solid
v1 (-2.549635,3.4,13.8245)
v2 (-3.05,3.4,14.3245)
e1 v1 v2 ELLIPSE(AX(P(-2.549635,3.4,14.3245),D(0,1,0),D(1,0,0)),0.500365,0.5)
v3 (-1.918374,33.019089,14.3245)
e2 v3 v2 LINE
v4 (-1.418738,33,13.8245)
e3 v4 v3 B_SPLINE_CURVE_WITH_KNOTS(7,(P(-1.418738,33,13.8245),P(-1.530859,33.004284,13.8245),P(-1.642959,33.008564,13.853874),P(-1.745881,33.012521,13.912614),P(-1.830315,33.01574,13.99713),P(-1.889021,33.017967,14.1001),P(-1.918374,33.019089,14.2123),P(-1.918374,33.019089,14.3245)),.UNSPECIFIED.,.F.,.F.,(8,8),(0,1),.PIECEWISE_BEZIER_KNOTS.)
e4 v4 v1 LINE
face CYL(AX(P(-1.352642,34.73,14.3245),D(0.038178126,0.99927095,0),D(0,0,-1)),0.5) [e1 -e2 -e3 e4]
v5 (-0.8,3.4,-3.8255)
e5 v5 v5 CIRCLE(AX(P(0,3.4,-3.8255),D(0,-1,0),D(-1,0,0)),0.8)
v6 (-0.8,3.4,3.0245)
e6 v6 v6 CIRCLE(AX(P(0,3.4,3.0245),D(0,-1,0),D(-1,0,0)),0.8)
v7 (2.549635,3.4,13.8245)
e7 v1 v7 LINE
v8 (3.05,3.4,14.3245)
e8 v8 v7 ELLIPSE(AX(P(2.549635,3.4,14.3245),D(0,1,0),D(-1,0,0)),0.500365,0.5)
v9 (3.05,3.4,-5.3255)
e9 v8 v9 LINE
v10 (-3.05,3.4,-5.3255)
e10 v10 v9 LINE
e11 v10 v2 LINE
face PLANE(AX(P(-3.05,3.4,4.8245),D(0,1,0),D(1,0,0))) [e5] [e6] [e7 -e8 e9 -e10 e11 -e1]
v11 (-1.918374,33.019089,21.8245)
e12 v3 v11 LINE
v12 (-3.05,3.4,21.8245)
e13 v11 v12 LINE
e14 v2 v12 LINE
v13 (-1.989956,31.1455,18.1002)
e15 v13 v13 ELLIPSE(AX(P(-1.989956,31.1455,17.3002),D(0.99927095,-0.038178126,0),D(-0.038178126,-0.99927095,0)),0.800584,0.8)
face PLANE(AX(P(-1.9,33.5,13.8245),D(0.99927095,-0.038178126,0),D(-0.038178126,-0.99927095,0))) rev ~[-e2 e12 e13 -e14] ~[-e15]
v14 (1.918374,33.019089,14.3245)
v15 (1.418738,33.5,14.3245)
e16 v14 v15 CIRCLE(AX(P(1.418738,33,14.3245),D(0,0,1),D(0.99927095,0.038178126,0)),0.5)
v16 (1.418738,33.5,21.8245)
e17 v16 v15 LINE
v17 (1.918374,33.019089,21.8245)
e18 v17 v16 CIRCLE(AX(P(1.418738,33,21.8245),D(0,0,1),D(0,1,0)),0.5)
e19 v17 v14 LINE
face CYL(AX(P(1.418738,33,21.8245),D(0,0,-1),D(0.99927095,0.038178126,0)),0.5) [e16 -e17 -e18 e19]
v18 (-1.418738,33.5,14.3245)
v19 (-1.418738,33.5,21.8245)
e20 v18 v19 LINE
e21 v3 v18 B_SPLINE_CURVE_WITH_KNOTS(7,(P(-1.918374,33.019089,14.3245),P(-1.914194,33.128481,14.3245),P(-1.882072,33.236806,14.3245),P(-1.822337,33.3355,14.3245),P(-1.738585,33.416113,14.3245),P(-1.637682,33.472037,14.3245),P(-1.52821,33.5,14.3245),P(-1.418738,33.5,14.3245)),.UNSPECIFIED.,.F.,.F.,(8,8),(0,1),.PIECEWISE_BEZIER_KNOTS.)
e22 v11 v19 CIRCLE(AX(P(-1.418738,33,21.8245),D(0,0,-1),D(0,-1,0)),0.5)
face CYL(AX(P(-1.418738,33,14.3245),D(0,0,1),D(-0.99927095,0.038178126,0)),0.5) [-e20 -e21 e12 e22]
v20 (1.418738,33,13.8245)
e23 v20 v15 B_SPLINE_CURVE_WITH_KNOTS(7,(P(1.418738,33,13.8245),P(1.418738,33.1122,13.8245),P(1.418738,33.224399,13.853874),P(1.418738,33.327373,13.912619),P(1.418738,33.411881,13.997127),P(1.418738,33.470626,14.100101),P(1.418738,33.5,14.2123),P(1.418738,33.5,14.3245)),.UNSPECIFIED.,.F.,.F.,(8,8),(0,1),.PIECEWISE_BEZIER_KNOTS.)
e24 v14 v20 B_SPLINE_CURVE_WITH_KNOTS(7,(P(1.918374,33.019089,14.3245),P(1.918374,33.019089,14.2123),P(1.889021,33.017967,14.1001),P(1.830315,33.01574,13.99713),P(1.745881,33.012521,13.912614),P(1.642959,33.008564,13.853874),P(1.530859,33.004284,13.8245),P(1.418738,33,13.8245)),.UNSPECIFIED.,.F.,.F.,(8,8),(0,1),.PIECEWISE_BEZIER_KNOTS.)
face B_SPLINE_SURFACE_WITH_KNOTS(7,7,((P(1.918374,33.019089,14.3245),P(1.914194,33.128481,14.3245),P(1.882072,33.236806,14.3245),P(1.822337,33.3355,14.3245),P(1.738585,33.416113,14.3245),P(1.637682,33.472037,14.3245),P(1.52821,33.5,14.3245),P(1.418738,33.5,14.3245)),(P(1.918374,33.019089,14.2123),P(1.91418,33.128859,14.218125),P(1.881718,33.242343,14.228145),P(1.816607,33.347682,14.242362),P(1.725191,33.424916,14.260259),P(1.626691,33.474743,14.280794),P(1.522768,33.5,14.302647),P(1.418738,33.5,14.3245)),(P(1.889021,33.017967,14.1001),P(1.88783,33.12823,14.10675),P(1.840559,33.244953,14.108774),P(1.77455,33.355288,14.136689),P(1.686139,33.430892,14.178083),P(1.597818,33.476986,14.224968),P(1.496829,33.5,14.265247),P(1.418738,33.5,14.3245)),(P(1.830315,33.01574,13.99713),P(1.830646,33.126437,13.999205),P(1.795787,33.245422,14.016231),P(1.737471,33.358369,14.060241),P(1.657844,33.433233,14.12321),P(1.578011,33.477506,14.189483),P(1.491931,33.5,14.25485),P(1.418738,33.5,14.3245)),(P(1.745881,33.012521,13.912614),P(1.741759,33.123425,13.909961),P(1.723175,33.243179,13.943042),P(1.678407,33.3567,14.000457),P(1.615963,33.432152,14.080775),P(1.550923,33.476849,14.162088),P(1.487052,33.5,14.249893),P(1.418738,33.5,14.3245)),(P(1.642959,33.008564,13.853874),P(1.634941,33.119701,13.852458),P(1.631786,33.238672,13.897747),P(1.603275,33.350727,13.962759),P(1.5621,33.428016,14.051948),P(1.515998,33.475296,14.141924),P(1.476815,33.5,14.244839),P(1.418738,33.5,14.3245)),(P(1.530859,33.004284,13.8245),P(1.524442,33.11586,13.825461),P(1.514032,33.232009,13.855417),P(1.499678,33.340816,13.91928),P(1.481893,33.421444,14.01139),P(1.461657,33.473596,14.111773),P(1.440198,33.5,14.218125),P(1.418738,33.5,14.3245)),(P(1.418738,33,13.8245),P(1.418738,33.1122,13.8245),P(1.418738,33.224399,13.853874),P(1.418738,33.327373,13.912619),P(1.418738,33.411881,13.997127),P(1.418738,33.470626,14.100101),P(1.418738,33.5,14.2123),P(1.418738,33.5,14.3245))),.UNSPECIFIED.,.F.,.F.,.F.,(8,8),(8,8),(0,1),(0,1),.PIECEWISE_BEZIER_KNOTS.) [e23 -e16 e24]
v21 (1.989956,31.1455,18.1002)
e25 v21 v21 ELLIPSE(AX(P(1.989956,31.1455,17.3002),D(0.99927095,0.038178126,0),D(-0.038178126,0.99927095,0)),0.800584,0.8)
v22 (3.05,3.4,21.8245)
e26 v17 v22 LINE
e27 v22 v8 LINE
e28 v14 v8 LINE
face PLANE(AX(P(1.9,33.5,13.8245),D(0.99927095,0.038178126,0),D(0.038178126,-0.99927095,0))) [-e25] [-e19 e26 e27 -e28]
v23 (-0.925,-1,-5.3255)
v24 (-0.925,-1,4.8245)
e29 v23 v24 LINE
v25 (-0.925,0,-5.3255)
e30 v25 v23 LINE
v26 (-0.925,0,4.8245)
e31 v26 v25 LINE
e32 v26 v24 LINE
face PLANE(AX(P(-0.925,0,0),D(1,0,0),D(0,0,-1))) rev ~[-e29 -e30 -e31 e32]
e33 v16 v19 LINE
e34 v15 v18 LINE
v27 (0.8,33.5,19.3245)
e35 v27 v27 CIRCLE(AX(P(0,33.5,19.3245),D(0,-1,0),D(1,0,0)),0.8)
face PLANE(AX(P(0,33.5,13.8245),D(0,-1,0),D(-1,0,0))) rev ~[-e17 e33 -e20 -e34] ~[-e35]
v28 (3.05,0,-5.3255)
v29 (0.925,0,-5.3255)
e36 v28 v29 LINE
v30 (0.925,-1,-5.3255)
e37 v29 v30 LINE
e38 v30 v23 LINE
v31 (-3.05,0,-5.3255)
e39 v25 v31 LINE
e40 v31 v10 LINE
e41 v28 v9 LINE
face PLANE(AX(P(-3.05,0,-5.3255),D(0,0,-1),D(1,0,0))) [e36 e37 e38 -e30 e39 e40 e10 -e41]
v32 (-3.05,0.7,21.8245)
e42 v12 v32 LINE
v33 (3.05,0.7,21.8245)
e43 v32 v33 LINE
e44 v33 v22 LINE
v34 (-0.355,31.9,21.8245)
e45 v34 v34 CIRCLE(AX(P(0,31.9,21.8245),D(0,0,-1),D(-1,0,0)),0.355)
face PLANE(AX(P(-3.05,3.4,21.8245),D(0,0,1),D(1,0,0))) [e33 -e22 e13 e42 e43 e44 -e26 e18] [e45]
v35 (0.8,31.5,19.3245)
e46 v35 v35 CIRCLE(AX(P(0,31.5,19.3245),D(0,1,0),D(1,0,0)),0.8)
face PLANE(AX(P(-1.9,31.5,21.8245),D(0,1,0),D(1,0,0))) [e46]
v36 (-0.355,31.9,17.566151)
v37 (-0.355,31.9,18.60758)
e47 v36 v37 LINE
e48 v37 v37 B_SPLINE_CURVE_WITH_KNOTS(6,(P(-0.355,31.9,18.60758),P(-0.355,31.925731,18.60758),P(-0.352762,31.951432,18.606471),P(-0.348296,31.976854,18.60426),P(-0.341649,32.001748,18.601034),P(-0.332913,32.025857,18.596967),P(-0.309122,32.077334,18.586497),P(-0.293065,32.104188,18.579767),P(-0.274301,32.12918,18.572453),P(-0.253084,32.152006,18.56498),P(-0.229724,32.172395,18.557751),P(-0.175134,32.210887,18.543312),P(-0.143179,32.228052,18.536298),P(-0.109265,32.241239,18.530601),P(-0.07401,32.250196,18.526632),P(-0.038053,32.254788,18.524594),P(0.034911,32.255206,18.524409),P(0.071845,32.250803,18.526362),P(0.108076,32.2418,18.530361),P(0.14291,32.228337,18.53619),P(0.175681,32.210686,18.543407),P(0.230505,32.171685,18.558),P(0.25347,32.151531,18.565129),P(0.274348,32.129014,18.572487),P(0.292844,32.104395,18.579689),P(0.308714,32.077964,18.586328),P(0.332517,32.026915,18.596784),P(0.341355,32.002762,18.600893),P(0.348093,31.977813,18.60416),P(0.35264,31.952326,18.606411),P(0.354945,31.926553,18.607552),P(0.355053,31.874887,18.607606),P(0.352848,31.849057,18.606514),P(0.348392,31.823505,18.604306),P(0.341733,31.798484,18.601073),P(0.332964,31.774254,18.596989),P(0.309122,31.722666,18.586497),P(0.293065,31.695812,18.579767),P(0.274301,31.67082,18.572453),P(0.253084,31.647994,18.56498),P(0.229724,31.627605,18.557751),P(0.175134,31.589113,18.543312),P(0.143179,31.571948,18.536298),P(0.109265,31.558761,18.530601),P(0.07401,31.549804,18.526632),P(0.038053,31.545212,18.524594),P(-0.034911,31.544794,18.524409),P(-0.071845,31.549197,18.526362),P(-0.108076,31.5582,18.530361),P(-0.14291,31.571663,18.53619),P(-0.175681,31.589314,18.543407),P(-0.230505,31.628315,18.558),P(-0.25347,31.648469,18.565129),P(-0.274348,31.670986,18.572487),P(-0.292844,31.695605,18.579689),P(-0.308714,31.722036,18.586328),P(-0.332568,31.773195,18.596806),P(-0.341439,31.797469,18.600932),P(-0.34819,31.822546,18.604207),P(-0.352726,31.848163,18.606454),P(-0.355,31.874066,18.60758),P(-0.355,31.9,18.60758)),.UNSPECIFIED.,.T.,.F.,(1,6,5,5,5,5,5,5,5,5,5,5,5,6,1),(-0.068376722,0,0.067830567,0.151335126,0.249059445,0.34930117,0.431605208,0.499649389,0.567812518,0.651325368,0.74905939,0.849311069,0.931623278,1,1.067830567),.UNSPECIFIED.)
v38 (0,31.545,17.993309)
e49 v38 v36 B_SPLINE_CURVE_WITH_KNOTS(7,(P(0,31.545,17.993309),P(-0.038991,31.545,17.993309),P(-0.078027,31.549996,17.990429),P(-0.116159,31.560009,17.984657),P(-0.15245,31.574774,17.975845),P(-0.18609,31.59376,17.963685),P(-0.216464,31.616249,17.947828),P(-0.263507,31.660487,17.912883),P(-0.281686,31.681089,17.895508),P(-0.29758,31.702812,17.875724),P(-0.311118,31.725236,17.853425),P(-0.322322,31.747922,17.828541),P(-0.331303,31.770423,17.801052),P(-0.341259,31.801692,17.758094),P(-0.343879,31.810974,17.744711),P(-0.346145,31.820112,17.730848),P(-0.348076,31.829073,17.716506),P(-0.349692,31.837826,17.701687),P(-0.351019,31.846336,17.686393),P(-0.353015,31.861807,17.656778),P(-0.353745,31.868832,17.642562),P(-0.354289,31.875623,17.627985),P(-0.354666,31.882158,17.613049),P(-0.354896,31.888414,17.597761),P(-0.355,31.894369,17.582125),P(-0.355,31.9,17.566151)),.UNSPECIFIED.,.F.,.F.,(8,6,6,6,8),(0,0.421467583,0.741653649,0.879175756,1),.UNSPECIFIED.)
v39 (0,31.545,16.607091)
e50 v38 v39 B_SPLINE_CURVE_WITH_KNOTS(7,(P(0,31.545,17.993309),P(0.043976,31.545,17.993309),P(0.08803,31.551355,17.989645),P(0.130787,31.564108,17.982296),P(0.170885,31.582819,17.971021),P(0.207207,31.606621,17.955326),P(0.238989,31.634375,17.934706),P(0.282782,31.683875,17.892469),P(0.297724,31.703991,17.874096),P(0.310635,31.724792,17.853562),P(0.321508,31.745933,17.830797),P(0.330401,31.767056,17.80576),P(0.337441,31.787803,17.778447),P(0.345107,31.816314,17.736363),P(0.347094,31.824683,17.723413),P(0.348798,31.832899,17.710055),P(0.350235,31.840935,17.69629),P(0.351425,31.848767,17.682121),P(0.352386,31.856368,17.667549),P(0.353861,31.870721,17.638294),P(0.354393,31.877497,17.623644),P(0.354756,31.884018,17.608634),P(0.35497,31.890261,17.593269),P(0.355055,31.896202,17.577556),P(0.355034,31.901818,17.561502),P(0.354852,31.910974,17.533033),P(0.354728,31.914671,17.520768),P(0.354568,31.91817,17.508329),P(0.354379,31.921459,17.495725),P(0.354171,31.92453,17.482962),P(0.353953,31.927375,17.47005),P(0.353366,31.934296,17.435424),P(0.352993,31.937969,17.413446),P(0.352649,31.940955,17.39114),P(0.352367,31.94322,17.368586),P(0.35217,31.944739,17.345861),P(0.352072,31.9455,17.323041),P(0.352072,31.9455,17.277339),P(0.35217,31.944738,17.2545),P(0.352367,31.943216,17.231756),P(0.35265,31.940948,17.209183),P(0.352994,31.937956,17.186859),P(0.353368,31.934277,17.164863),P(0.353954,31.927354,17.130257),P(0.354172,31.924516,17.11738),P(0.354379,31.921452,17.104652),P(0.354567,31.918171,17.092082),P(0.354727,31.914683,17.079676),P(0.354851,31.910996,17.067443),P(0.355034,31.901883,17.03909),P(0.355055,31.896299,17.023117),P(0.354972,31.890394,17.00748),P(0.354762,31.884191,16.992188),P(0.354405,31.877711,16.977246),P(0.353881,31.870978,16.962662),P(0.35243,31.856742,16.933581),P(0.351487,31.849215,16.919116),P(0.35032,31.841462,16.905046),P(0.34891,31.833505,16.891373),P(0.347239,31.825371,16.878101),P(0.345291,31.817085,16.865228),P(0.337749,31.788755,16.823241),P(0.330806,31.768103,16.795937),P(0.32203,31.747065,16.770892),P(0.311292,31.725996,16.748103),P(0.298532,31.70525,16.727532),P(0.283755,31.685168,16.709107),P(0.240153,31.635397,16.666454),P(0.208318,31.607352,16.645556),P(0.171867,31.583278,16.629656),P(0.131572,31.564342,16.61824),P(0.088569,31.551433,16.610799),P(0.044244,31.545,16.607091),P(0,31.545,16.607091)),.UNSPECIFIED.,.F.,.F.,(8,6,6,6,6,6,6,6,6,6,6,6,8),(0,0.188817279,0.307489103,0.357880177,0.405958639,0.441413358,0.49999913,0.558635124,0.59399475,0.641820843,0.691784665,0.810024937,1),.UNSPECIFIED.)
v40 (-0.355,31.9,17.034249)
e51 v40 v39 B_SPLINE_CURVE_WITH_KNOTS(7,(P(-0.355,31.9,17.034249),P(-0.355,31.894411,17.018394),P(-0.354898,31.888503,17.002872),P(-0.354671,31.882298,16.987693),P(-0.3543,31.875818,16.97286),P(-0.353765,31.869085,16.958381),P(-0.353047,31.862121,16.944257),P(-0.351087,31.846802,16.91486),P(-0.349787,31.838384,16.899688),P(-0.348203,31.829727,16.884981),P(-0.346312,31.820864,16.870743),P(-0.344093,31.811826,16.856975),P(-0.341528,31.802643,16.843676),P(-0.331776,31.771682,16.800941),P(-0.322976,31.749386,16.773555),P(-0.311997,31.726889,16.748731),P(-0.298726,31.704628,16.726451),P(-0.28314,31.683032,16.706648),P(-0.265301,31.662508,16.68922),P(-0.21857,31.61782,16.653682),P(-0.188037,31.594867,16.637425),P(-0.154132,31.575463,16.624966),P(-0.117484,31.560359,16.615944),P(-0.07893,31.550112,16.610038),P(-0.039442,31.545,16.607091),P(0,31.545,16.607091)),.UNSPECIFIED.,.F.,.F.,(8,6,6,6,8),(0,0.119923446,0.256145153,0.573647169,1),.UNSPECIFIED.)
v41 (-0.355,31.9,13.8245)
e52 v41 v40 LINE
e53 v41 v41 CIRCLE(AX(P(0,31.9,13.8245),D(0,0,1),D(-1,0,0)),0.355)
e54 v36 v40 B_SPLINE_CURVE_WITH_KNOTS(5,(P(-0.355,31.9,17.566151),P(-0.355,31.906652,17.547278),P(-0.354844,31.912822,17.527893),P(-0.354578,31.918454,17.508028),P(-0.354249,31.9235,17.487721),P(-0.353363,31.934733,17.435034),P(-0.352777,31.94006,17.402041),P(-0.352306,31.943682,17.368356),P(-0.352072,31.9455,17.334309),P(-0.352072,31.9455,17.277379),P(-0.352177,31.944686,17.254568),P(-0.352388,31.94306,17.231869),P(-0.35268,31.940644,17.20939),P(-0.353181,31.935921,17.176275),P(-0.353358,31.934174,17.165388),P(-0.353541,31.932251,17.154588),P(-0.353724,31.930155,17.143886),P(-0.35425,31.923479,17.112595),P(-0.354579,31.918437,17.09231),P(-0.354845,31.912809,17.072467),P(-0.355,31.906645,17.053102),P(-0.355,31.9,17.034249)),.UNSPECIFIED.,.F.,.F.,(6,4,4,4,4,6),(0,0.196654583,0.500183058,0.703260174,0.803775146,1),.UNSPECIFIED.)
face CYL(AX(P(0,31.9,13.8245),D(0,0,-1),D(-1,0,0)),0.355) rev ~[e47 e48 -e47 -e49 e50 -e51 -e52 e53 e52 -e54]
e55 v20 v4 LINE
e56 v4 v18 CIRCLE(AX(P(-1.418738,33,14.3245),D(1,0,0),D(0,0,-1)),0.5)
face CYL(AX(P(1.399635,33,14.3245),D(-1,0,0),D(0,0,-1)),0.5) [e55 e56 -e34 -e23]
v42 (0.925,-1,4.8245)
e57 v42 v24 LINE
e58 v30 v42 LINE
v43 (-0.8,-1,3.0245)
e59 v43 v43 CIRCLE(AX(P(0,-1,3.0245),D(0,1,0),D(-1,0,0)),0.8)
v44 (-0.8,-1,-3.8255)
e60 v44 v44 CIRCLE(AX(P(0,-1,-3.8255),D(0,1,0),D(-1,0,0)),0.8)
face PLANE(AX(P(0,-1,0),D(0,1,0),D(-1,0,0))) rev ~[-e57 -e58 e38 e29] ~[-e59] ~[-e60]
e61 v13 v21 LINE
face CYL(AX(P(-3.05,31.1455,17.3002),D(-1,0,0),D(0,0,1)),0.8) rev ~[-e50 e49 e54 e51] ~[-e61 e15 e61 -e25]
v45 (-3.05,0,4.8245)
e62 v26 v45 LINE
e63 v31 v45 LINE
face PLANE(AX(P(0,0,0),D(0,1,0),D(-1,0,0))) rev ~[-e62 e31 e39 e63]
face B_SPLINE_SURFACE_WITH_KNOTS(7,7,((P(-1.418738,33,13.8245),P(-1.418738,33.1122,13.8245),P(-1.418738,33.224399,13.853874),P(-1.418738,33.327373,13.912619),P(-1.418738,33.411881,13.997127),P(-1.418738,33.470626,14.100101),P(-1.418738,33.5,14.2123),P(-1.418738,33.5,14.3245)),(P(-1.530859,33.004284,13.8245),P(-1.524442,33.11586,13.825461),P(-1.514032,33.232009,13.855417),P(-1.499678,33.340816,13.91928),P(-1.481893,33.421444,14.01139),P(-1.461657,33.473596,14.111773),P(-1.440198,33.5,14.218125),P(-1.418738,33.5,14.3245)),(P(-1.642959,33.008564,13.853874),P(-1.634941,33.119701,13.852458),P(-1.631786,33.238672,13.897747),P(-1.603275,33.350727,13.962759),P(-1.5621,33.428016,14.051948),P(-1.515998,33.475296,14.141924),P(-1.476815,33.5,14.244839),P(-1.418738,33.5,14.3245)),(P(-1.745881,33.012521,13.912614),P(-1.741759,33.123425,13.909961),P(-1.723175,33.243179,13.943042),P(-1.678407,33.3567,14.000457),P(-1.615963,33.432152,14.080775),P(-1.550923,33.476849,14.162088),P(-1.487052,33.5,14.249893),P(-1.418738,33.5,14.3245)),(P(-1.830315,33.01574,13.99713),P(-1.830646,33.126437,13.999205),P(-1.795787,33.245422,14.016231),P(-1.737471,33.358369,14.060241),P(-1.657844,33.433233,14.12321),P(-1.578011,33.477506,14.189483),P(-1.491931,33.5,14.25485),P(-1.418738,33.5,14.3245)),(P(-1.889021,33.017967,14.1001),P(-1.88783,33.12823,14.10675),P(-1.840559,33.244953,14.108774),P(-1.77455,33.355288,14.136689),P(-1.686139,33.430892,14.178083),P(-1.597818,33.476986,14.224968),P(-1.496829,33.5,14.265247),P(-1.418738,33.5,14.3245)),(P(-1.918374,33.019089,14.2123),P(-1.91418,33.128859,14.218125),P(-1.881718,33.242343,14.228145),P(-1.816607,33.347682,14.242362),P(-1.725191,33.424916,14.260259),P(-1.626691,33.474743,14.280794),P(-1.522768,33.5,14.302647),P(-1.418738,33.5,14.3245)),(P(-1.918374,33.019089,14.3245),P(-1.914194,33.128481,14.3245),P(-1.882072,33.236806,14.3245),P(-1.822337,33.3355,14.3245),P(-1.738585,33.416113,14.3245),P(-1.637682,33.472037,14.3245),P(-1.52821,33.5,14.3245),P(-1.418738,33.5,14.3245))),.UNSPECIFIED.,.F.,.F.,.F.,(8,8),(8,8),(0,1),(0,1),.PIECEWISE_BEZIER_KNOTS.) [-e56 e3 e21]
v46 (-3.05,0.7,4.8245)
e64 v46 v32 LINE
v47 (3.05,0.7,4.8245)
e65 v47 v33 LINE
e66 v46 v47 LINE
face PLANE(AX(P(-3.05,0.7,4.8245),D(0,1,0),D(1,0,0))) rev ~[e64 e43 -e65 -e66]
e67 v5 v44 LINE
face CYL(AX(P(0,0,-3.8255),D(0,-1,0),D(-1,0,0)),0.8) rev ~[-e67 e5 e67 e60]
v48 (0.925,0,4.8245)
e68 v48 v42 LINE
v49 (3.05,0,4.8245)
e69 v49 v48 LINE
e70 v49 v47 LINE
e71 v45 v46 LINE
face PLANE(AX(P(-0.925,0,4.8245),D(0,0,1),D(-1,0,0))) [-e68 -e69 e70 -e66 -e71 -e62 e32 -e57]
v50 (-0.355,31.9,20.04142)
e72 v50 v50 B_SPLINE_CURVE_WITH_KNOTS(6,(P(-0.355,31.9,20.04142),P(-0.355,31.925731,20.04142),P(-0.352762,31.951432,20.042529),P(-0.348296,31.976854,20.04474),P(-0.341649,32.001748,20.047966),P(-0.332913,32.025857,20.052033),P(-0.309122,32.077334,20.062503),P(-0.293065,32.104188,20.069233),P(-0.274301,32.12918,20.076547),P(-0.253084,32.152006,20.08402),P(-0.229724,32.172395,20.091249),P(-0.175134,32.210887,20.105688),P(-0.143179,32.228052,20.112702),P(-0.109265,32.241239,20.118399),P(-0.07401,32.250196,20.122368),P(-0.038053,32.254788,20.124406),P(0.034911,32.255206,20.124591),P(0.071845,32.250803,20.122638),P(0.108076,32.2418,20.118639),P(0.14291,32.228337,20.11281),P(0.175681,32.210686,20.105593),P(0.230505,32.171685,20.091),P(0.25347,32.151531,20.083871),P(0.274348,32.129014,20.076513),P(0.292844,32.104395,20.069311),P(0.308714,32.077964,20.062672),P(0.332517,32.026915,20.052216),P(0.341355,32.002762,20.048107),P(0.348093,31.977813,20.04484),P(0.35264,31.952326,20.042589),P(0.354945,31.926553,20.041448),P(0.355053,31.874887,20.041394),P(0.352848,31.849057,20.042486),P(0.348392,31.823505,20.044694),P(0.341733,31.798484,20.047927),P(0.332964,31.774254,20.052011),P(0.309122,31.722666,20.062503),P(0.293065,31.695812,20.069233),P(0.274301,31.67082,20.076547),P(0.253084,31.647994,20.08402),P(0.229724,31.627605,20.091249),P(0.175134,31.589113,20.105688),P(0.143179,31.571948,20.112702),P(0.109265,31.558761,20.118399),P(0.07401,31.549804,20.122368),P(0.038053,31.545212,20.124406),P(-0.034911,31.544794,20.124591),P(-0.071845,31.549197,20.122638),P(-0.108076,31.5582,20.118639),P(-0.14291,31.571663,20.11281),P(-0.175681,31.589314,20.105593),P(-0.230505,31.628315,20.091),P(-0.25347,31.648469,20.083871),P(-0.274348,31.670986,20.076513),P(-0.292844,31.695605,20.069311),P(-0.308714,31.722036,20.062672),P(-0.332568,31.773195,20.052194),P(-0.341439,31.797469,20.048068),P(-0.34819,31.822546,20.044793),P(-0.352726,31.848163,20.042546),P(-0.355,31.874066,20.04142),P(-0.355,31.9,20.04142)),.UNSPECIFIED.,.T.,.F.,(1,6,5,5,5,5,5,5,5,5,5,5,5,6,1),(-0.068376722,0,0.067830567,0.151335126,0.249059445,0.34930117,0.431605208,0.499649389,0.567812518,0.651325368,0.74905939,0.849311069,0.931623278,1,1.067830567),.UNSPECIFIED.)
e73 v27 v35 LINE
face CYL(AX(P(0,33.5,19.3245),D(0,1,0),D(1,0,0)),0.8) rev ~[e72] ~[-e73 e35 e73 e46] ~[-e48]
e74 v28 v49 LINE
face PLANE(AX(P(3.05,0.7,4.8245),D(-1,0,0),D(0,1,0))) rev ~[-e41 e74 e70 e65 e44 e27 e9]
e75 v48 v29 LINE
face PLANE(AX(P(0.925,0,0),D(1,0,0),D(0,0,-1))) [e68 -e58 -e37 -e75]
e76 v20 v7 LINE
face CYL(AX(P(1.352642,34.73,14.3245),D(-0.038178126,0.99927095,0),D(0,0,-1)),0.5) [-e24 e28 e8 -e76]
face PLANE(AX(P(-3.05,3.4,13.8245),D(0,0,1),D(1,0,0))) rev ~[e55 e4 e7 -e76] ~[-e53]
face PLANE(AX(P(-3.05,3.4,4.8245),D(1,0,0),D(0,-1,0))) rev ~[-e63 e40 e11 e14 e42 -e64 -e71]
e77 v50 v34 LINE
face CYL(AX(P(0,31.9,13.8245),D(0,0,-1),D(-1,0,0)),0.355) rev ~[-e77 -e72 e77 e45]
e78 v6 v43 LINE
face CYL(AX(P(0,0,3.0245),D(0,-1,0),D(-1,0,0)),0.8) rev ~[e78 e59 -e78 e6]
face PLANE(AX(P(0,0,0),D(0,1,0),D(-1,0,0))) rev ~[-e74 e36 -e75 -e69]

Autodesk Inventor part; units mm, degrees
ref_plane "YZ Plane" through (0, 0, 0) normal (1, 0, 0) x (0, 1, 0)
ref_plane "XZ Plane" through (0, 0, 0) normal (0, 1, 0) x (-1, 0, 0)
sketch "Sketch1" plane through (0, 0, 0) normal (0, 1, 0) x (-1, 0, 0)
  line L0 (3.05, -5.3255) -> (-3.05, -5.3255)
  line L1 (-3.05, -5.3255) -> (-3.05, 4.8245)
  line L2 (-3.05, 4.8245) -> (3.05, 4.8245)
  line L3 (3.05, 4.8245) -> (3.05, -5.3255)
  line L4 (0.925, 4.8245) -> (-0.925, 4.8245)
  line L5 (0.925, 4.8245) -> (0.925, -5.3255)
  line L6 (-0.925, 4.8245) -> (-0.925, -5.3255)
  circle A0 centre (0, 3.0245) radius 0.8
  circle A1 centre (0, -3.8255) radius 0.8
  line L7 (0, 4.8245) -> (0, -5.3255)
  line L8 (-3.05, 0) -> (3.05, 0)
  point P0 (0, 0)
  dimension "d13" = 6.1
  dimension "d44" = 1.85
  dimension "d45" = 2.125
  dimension "d46" = 1.6
  dimension "d47" = 1.6
  dimension "d128" = 6.85
extrude "Extrusion1" add sketch "Sketch1" along normal blind 3.4 contours L0 L5 L8 L3 | L0 L7 A1 L8 L5 | L8 L5 L2 L3 | L0 L6 L8 L7 A1 | L8 L7 A0 L2 L5 | L0 L1 L8 L6 | L8 L6 L2 L7 A0 | L8 L1 L2 L6
extrude "Extrusion6" add sketch "Sketch1" against normal blind 1 contours L0 L7 A1 L8 L5 | L0 L6 L8 L7 A1 | L8 L7 A0 L2 L5 | L8 L6 L2 L7 A0
sketch "Sketch13" plane through (-3.05, 3.4, 4.8245) normal (0, 0, 1) x (1, 0, 0)
  line L0 (0, 0) -> (0, -2.7)
  line L1 (0, -3.4) -> (0, 0) projected
  line L2 (0, -2.7) -> (6.1, -2.7)
  line L3 (6.1, -3.4) -> (6.1, 0) projected
  line L4 (6.1, 0) -> (6.1, -2.7)
  line L5 (0, 0) -> (6.1, 0)
  point P0 (3.05, -3.4)
  point P1 (6.1, -3.41)
  dimension "d56" = 2.7
extrude "Extrusion8" add sketch "Sketch13" along normal blind 17
sketch "Sketch17" plane through (-3.05, 3.4, 21.8245) normal (0, 0, 1) x (1, 0, 0)
  line L0 (6.1, 0) -> (0, 0) projected
  line L1 (6.1, 0) -> (19.567, 0) construction
  line L2 (16.968, 8.2706) -> (10.0894, 18.4685)
  line L3 (10.0894, 18.4685) -> (13.5713, 20.8172)
  line L4 (13.5713, 20.8172) -> (20.102, 11.1351)
  line L5 (20.102, 11.1351) -> (22.1374, 8.1174)
  line L6 (6.1, -3.4) -> (6.1, -2.7) projected
  line L7 (22.1374, 8.1174) -> (6.1, -2.7)
  line L8 (6.1, 0) -> (6.1, -2.7)
  line L9 (6.1, 0.94) -> (6.1, 0)
  line L10 (6.1, 0.94) -> (3.05, 0.94)
  line L11 (3.05, 0.94) -> (3.05, 0)
  line L12 (16.968, 8.2706) -> (6.1, 0.94)
  line L13 (6.1, 0.94) -> (7.7497, 0.94)
  point P0 (3.05, -3.4)
  dimension "d74" = 12.301
  dimension "d75" = 4.2
  dimension "d92" = 3.64
  dimension "d93" = 3.64
  dimension "d94" = 10.868
  dimension "d98" = 34
extrude "Extrusion12" [suppressed]
ref_plane "Work Plane3" through (-3.05, 3.4, 13.8245) normal (0, 0, 1) x (1, 0, 0)
sketch "Sketch29" plane through (-3.05, 3.4, 13.8245) normal (0, 0, 1) x (1, 0, 0)
  line L0 (3.85, -4.4) -> (2.25, -4.4) projected
  line L1 (3.05, -4.4) -> (3.05, 30.1)
  line L2 (4.95, 30.1) -> (3.05, 30.1)
  line L3 (3.05, 30.1) -> (1.15, 30.1)
  line L4 (6.1, -3.4) -> (6.1, 0) projected
  line L5 (4.95, 30.1) -> (6.1, 0)
  line L6 (0, -3.4) -> (0, 0) projected
  line L7 (1.15, 30.1) -> (0, 0)
  line L8 (0, 0) -> (6.1, 0)
  point P0 (3.05, -3.4)
  point P1 (3.0506, 28.6)
  dimension "d137" = 34.5
  dimension "d138" = 3.8
extrude "Extrusion20" add sketch "Sketch29" along normal blind 8
fillet "Fillet6" radius 0.5 2 edges at (2.475, 18.45, 13.8245) (-2.475, 18.45, 13.8245)
sketch "Sketch14" plane through (0, 3.4, 0) normal (0, 1, 0) x (1, 0, 0)
  line L0 (3.05, 5.3255) -> (3.05, -21.8245) projected
  line L1 (3.05, -21.8245) -> (3.05, -13.8245)
  line L2 (3.05, -13.8245) -> (-3.05, -13.8245)
  line L3 (-3.05, 5.3255) -> (-3.05, -21.8245) projected
  line L4 (-3.05, -21.8245) -> (3.05, -21.8245)
  point P0 (0, 0)
  dimension "d59" = 8
extrude "Extrusion9" [suppressed]
sketch "Sketch16" plane through (0, 35.4, 0) normal (0, 1, 0) x (1, 0, 0)
  circle A0 centre (-0.1175, -18.652) radius 1.5
  line L0 (1.9325, -20.707) -> (-1.9325, -20.707) projected
  line L1 (1.9325, -14.9419) -> (1.9325, -20.707) projected
  point P0 (0, 0)
  point P1 (0, -20.707)
  dimension "d67" = 3
  dimension "d68" = 2.055
  dimension "d69" = 2.05
extrude "Extrusion11" [suppressed]
sketch "Sketch15" plane through (-3.05, 3.4, 21.8245) normal (0, 0, 1) x (1, 0, 0)
  line L0 (2.6762, 10.6502) -> (2.7739, 7.8519) construction
  line L1 (6.1, 0) -> (4.9825, 32) projected
  line L2 (1.6768, 10.6153) -> (1.7746, 7.817)
  line L3 (3.7733, 7.8868) -> (3.6756, 10.6851)
  arc A0 (3.6756, 10.6851) -> (1.6768, 10.6153) centre (2.6762, 10.6502) ccw
  arc A1 (1.7746, 7.817) -> (3.7733, 7.8868) centre (2.7739, 7.8519) ccw
  point P0 (3.05, -3.4)
  point P1 (2.7251, 9.251)
  dimension "d62" = 1.4
  dimension "d63" = 2
  dimension "d64" = 3.05
extrude "Extrusion10" [suppressed]
sketch "Sketch20" plane through (10.5213, 24.2172, 21.8245) normal (-0.5591929, 0.8290376, 0) x (0.8290376, 0.5591929, 0)
  circle A0 centre (-2.15, 2.0494) radius 1.5
  line L0 (-4.2, 0) -> (-4.2, 4.1) projected
  line L1 (0, 0) -> (-4.2, 0) projected
  point P0 (-22.2646, 21.8245)
  point P1 (-2.1, 0)
  dimension "d82" = 3
  dimension "d83" = 2.05
  dimension "d84" = 2.05
extrude "Extrusion14" [suppressed]
sketch "Sketch18" plane through (-3.05, 3.4, 21.8245) normal (0, 0, 1) x (1, 0, 0)
  line L0 (12.7441, 18.3775) -> (14.3099, 16.0562) construction
  line L1 (11.9151, 17.8183) -> (13.4808, 15.497)
  line L2 (15.1389, 16.6154) -> (13.5732, 18.9367)
  arc A0 (13.5732, 18.9367) -> (11.9151, 17.8183) centre (12.7441, 18.3775) ccw
  arc A1 (13.4808, 15.497) -> (15.1389, 16.6154) centre (14.3099, 16.0562) ccw
  line L3 (22.1374, 8.1174) -> (13.5713, 20.8172) projected
  line L4 (10.0894, 18.4685) -> (13.5713, 20.8172) projected
  point P0 (3.05, -3.4)
  point P1 (13.527, 17.2169)
  point P2 (12.1849, 19.2066)
  dimension "d78" = 1.4
  dimension "d79" = 2
  dimension "d89" = 0.56
  dimension "d90" = 2.05
extrude "Extrusion13" [suppressed]
sketch "Sketch21" plane through (13.7716, 15.5536, 19.7751) normal (-0.5591929, 0.8290376, 0) x (0.8290376, 0.5591929, 0)
  circle A0 centre (0, 0) radius 0.868
  point P0 (-20.1146, 19.7751)
extrude "Extrusion15" [suppressed]
mirror "Mirror3" [suppressed]
chamfer "Chamfer1" [suppressed]
fillet "Fillet1" [suppressed]
sketch "Sketch24" plane through (-3.05, 0, -5.3255) normal (-1, 0, 0) x (0, 0, 1)
  circle A0 centre (22.6257, 31.1455) radius 0.8
  point P0 (5.3255, 0)
  point P1 (27.15, 0.7)
  dimension "d109" = 1.6
extrude "Extrusion18" cut sketch "Sketch24" against normal through all
sketch "Sketch26" plane through (0, 35.4, 0) normal (0, 1, 0) x (1, 0, 0)
  circle A0 centre (0, -19.1945) radius 0.8
  point P0 (0, 0)
  dimension "d131" = 1.6
extrude "Extrusion19" [suppressed]
fillet "Fillet4" [suppressed]
sketch "Sketch31" plane through (-3.05, 3.4, 13.8245) normal (0, 0, -1) x (-1, 0, 0)
  line L0 (-3.05, -3.4) -> (-3.05, 28.5)
  circle A0 centre (-3.05, 28.5) radius 0.355
  dimension "d145" = 31.9
  dimension "d147" = 0.71
extrude "Extrusion22" cut sketch "Sketch31" against normal through all
sketch "Sketch33" plane through (-1.9, 33.5, 21.8245) normal (0, 1, 0) x (1, 0, 0)
  line L0 (3.8, 0) -> (0, 0) projected
  line L1 (3.8, 7.5) -> (3.8, 0) projected
  line L2 (0, 7.5) -> (0, 0) projected
  circle A0 centre (1.9, 2.5) radius 0.8
  line L3 (1.9, 2.5) -> (3.8, 2.5)
  line L4 (1.9, 2.5) -> (0, 2.5)
  point P0 (1.9, 21.8245)
  dimension "d150" = 1.6
  dimension "d151" = 2.5
extrude "Extrusion23" cut sketch "Sketch33" against normal blind 2 contours L3 L4 A0 | A0 L4 L3
fillet "Fillet7" radius 0.5 4 edges at (-1.9, 33.5, 18.0745) (1.7534, 33.5, 13.9709) (0, 33.5, 13.8245) (1.9, 33.5, 18.0745)
sketch "Sketch34" plane through (-3.05, 3.4, 13.8245) normal (0, 0, -1) x (-1, 0, 0)
  point P0 (-3.05, -3.4)
equation "\"d13\" = base_width"
equation "\"d45\" = -0.5 * d44 + 0.5 * d13"
equation "\"d4\" = base_length"
equation "\"base_width\" = 6.1"
equation "\"base_length\" = 3.4"
equation "\"base_screw_diameter\" = 1.5"
equation "\"base_screw_spacing_edge\" = 8.5"
equation "\"multi_angle\" = 34deg"
properties part number "microstim_holder_bottom"
